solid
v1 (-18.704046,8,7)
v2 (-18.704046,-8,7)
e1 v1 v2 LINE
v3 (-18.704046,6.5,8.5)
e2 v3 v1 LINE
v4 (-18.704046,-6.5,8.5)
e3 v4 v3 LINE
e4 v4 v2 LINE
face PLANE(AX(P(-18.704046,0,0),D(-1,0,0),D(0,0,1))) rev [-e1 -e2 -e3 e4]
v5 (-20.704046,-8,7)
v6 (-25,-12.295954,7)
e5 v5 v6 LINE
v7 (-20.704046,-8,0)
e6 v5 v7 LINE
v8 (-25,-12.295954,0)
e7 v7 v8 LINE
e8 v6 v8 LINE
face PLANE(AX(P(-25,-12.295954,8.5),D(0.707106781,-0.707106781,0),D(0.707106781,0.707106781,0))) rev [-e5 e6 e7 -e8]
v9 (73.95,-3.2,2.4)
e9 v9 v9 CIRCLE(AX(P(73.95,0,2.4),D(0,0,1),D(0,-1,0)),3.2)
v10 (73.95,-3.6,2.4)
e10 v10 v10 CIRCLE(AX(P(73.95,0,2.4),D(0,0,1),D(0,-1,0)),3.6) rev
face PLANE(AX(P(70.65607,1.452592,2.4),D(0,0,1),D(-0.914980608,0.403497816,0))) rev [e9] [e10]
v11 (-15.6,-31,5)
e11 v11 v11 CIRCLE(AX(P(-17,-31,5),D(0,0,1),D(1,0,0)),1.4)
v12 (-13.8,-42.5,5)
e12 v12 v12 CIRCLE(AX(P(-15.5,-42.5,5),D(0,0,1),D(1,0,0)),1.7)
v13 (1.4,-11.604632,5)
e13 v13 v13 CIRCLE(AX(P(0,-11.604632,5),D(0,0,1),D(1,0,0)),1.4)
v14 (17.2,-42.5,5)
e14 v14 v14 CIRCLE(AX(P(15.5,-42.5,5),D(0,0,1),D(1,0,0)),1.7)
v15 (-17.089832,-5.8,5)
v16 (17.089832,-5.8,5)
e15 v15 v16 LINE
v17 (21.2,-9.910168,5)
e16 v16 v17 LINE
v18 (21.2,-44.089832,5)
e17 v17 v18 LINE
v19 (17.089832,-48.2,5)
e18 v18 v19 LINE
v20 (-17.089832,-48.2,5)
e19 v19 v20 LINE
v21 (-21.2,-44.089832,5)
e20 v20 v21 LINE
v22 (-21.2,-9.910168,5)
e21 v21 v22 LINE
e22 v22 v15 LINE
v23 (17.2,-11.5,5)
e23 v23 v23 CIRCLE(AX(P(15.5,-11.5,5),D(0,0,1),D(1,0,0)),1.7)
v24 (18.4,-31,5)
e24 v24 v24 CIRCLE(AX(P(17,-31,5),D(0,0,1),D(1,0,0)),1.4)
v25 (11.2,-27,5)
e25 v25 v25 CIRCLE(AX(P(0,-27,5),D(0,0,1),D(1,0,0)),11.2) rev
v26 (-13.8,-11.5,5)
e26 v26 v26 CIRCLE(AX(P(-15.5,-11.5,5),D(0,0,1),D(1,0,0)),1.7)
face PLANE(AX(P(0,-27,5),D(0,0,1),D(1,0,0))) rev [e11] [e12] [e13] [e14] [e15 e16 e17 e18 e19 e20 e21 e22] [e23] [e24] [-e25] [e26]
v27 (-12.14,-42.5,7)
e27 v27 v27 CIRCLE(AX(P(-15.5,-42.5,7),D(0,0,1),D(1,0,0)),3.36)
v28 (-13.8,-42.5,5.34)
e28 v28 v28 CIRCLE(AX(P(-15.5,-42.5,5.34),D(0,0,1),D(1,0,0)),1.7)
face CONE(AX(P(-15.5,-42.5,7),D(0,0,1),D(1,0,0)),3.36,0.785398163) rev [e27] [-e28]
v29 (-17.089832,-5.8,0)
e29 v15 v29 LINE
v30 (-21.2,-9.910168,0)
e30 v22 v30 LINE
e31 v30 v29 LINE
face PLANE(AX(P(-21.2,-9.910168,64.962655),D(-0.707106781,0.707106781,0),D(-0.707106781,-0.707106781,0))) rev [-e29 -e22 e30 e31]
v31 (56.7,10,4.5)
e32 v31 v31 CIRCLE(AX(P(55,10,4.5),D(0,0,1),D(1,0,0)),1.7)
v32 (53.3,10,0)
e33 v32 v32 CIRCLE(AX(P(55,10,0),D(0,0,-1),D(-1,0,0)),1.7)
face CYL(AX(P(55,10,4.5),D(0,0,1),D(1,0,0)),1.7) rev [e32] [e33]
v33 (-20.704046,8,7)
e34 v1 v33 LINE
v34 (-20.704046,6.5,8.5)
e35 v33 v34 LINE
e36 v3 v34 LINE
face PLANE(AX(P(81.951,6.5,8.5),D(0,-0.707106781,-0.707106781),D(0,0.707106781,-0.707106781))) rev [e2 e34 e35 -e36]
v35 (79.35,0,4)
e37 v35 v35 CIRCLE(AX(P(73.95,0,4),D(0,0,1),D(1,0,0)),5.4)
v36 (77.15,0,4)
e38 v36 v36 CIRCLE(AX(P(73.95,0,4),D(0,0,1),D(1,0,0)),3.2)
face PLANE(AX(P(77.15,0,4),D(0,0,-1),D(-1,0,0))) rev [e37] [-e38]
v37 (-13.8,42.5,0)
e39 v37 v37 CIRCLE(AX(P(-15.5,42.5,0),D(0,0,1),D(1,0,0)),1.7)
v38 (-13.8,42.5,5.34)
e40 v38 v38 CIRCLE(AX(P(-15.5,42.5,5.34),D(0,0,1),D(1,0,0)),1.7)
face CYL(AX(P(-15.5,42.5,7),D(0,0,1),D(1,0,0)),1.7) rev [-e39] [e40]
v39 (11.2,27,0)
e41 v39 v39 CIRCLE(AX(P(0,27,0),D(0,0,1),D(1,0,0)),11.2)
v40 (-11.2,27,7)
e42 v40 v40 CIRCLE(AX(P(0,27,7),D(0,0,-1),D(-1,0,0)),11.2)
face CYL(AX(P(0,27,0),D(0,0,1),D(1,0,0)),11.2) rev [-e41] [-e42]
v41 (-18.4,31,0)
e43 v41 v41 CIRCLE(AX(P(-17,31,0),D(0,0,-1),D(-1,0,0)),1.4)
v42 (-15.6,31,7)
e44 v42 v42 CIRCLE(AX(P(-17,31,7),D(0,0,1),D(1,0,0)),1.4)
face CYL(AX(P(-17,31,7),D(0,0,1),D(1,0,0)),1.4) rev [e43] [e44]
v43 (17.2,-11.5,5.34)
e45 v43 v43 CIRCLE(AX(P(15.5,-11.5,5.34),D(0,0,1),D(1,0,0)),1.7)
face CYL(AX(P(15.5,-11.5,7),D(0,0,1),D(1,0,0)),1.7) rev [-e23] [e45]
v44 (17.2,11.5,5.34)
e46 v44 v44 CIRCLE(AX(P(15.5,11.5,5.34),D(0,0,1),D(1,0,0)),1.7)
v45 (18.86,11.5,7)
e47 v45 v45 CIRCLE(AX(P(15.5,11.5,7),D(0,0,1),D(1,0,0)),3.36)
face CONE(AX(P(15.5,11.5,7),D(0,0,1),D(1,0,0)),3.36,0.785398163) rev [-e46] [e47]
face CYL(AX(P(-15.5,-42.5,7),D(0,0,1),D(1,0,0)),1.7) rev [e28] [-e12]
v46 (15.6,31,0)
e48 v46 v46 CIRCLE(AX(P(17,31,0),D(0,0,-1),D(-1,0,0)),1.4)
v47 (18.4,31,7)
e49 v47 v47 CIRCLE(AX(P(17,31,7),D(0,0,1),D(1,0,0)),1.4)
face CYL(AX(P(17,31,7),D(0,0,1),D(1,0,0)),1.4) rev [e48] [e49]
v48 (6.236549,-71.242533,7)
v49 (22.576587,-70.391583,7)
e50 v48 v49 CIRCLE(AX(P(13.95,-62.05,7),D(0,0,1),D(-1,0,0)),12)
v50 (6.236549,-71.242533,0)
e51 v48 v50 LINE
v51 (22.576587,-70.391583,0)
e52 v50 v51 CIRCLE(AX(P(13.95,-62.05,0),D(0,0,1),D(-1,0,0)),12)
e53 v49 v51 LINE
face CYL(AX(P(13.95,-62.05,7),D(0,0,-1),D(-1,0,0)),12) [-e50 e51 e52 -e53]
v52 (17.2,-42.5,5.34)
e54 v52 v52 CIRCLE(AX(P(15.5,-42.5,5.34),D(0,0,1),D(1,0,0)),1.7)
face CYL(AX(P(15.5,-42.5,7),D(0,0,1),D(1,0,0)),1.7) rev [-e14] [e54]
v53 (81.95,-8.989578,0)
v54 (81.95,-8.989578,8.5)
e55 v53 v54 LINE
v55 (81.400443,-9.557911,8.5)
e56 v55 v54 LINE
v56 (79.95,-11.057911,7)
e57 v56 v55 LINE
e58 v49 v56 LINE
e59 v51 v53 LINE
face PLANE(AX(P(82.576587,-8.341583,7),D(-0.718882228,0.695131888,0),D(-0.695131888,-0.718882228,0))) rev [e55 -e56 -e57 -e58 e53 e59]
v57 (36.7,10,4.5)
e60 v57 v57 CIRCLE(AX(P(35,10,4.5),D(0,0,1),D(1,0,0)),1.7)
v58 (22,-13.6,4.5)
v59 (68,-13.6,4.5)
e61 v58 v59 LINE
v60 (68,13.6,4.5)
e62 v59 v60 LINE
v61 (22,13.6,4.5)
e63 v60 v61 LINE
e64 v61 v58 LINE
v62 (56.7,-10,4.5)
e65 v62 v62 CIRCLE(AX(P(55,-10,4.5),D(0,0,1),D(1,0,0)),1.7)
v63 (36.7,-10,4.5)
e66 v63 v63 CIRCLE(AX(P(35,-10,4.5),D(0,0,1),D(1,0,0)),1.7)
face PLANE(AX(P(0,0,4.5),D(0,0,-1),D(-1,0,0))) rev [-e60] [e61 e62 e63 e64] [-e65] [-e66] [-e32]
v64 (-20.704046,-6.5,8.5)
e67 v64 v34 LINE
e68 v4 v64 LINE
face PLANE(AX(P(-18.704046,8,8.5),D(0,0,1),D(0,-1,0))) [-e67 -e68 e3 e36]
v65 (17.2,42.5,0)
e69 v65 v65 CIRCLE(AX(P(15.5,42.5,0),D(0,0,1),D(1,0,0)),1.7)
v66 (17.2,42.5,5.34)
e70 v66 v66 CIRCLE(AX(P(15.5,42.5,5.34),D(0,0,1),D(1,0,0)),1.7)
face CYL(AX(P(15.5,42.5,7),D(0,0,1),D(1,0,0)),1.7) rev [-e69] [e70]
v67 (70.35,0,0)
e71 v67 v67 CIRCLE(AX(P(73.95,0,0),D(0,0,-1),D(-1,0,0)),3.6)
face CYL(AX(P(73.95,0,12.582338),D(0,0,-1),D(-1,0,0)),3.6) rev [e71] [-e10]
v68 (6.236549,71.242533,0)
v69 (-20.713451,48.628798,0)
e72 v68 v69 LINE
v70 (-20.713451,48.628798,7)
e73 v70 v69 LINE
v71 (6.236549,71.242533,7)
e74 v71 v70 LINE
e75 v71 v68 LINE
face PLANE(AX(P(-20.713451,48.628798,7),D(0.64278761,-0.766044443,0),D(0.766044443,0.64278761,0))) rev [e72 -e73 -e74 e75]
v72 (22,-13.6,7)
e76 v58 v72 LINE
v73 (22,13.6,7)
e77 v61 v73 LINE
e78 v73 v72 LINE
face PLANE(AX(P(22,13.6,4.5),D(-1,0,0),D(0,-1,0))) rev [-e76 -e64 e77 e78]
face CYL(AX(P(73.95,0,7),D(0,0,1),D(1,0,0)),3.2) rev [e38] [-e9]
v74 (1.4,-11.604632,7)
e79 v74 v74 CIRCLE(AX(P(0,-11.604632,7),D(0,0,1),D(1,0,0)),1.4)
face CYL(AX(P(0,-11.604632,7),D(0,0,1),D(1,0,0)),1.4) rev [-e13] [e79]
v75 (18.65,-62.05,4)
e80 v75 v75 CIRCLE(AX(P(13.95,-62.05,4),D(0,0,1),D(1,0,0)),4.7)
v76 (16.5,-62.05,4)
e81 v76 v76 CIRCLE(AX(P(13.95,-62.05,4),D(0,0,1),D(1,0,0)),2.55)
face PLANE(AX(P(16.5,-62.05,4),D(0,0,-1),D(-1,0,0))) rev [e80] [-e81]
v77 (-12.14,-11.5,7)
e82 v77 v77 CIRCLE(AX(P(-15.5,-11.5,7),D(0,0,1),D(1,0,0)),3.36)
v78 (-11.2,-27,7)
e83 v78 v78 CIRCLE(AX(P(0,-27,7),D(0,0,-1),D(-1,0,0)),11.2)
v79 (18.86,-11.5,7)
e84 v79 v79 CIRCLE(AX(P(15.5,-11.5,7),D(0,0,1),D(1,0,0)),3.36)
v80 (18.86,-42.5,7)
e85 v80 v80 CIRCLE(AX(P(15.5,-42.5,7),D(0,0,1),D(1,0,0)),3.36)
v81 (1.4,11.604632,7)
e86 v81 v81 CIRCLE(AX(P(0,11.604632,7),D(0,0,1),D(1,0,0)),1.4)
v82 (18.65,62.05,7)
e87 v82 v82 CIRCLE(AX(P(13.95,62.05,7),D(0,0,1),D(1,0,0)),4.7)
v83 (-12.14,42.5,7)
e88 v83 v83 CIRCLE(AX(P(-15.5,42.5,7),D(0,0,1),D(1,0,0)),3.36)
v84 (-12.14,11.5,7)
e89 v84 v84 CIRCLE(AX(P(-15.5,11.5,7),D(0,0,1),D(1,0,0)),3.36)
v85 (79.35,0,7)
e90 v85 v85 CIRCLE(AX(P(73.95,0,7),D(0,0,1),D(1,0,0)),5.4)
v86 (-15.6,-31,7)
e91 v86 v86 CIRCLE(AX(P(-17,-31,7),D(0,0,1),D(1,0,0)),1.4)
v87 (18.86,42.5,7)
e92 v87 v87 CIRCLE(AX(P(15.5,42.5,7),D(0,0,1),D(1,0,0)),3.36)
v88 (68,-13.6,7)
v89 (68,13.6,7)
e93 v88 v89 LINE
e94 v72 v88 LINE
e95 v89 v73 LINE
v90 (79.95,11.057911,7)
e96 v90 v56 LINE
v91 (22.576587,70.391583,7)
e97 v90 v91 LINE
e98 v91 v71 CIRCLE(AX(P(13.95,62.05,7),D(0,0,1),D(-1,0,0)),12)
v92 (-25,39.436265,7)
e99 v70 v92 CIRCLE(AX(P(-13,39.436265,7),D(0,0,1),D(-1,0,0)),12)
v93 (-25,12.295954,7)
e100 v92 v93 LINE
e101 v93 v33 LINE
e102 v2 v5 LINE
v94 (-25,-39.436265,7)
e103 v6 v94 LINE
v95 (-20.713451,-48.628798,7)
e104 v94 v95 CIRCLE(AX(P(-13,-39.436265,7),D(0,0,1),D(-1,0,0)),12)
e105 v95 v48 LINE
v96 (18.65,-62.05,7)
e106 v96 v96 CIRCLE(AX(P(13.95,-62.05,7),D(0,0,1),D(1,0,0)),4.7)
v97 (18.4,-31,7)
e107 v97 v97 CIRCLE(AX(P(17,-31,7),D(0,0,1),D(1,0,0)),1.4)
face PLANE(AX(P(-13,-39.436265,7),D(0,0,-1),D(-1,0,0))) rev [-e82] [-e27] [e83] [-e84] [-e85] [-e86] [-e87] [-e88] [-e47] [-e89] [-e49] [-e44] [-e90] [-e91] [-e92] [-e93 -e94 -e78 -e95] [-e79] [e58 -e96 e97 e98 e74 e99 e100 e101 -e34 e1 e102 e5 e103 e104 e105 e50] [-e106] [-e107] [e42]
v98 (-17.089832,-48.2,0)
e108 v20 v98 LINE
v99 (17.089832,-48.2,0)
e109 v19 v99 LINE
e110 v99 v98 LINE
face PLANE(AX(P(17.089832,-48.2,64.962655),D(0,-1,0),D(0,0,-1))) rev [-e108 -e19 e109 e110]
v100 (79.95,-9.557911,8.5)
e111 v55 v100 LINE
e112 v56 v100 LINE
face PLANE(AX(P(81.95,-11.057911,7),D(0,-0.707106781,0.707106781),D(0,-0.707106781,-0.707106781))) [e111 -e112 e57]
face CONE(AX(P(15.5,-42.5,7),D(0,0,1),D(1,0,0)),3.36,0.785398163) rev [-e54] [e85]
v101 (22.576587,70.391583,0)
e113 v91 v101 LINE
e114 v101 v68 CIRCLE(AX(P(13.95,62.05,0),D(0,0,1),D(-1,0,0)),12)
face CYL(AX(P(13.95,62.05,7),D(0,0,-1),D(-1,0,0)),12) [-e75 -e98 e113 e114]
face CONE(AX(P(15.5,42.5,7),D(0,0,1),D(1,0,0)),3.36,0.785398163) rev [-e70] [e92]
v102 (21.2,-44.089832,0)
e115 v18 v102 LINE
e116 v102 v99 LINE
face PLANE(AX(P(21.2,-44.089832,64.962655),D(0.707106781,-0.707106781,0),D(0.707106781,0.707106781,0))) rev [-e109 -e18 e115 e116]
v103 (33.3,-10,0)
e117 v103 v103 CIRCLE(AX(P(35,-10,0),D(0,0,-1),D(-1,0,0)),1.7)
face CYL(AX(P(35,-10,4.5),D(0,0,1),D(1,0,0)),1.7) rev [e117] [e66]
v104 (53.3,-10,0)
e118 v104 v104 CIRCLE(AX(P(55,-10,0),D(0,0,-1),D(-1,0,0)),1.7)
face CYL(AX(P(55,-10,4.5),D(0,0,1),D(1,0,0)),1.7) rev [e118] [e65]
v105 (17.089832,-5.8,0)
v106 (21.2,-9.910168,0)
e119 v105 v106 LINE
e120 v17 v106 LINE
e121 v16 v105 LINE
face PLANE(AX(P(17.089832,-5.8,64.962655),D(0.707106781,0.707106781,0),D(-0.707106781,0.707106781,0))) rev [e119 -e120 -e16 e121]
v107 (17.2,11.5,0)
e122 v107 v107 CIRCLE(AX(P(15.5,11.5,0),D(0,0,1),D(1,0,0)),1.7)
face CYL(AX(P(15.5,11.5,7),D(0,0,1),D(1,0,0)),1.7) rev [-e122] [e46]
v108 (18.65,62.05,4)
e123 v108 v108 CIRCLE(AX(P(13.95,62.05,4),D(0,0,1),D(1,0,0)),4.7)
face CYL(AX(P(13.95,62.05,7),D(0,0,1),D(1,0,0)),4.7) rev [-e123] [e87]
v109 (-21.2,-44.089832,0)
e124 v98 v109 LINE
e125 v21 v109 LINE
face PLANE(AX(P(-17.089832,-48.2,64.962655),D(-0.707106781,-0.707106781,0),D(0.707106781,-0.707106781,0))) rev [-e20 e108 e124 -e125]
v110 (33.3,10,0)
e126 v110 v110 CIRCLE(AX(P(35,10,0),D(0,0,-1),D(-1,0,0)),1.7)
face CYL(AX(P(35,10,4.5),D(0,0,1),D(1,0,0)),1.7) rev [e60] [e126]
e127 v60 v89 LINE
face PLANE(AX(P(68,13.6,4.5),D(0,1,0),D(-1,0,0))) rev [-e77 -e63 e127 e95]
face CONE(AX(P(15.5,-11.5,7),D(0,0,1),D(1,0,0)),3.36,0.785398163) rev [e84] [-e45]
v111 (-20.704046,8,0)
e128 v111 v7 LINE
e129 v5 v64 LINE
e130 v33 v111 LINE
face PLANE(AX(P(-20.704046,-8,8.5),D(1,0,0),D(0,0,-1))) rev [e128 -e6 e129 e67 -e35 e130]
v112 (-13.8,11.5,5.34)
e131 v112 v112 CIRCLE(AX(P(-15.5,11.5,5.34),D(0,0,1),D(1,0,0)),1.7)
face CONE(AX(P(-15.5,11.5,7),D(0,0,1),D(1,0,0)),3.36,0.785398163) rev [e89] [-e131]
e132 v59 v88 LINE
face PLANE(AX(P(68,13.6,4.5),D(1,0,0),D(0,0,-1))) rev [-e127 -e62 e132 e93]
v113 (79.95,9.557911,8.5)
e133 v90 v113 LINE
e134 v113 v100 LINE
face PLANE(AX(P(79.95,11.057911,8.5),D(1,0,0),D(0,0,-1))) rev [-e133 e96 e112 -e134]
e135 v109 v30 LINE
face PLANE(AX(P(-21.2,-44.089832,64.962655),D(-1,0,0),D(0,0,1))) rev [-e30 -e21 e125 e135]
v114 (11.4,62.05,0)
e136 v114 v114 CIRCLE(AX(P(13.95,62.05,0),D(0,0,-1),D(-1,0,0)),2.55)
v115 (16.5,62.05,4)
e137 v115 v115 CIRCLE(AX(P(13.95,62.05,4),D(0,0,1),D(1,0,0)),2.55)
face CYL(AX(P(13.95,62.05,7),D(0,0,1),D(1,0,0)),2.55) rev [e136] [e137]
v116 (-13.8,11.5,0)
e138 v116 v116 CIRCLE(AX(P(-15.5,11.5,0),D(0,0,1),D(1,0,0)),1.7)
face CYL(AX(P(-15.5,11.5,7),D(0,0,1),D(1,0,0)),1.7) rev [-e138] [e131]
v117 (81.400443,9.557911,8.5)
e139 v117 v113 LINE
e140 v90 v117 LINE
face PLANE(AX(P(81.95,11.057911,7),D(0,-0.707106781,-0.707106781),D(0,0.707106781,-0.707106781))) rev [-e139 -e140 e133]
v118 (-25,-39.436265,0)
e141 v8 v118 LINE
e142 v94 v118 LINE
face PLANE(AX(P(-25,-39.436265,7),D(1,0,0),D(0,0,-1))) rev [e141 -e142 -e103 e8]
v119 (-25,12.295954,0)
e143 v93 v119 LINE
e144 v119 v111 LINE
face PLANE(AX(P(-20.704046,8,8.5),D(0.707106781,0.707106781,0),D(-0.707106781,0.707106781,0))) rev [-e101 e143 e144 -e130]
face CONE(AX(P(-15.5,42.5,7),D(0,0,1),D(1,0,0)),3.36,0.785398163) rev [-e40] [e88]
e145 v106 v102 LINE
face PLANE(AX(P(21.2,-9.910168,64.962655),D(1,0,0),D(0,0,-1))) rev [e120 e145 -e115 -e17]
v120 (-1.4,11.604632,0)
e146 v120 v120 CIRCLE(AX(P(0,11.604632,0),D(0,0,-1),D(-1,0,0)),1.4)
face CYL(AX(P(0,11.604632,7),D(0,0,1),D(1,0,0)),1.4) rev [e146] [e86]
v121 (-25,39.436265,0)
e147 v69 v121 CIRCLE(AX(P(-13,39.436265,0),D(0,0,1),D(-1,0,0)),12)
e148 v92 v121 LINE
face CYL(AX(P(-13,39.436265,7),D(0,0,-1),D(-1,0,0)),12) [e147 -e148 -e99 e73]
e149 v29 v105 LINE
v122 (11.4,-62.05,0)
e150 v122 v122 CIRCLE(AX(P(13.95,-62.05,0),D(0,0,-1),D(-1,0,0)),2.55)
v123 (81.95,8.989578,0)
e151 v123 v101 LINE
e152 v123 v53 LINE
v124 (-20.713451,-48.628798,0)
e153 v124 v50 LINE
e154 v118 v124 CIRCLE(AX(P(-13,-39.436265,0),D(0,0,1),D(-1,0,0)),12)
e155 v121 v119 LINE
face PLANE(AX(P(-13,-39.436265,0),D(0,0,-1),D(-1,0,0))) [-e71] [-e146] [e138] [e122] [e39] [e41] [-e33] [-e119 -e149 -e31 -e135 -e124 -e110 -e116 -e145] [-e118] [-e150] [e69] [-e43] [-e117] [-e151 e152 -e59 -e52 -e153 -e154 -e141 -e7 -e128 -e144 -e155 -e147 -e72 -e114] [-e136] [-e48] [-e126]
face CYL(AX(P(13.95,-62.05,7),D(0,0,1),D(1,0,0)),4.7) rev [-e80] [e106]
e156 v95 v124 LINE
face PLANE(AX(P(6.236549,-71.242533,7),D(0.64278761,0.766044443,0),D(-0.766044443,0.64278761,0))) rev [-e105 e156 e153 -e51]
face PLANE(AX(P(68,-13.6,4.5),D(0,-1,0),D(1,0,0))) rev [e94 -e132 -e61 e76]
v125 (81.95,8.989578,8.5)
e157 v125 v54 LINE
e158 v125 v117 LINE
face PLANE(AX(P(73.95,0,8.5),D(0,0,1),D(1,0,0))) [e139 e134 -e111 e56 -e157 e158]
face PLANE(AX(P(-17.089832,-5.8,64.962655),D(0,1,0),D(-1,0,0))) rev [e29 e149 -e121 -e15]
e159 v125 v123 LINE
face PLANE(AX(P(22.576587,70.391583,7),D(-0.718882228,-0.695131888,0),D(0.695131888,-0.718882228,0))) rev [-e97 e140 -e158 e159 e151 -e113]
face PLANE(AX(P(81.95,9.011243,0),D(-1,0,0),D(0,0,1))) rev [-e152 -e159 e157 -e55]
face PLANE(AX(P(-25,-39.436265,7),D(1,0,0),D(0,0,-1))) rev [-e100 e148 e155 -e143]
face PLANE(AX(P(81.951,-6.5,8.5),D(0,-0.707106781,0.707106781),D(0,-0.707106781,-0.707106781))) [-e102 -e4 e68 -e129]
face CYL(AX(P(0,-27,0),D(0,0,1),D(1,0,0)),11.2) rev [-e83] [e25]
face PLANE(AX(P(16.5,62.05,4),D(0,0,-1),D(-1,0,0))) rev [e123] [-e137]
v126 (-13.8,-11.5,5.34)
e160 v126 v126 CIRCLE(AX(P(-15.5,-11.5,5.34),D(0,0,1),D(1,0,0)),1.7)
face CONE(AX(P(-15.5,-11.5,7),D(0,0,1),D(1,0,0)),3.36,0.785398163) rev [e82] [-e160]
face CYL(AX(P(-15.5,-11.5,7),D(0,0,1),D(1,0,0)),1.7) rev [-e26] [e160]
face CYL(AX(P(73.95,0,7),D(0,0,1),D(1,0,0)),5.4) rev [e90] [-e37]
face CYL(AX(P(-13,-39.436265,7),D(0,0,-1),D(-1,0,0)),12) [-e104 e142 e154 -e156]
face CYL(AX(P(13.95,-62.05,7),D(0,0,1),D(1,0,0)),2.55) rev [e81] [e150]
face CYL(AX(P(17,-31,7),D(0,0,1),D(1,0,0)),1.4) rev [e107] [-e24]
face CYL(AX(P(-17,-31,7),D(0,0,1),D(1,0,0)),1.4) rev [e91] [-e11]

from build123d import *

# Parameters (mm, degrees)
BOSS_EXTRUDE1_DEPTH                = 7
BOSS_EXTRUDE2_DEPTH                = 1.5
SKETCH29_W                         = 6.05
SKETCH29_H                         = 18.000820755
CUT_EXTRUDE6_DEPTH                 = 114.767548097
CUT_EXTRUDE1_DEPTH                 = 111.671608825
CUT_EXTRUDE1_DEPTH_BACK            = 111.671608825
SKETCH3_R                          = 11.2
CUT_EXTRUDE3_START                 = -5
CUT_EXTRUDE3_DEPTH                 = 5
SKETCH8_W                          = 46
SKETCH8_H                          = 27.2
CUT_EXTRUDE4_DEPTH                 = 2.5
CUT_EXTRUDE5_START                 = -2.4
SKETCH16_R                         = 3.6
CUT_EXTRUDE5_DEPTH                 = 2.4
CUT_EXTRUDE7_DEPTH                 = 111.776599515
SKETCH32_W                         = 1.5
SKETCH32_H                         = 16
BOSS_EXTRUDE3_DEPTH                = 2
CUT_EXTRUDE8_DEPTH                 = 129.7251141
CUT_EXTRUDE9_REACH                 = 128.86
CSK_FOR_M3_SFHCS1_D                = 3.4
CSK_FOR_M3_SFHCS1_CSINK_D          = 6.72
CSK_FOR_M3_SFHCS1_CSINK_ANGLE      = 90
M3_CLEARANCE_HOLE1_D               = 3.4
CBORE_START                        = 4
CBORE_FOR_M5_SHCS1_OUTLINE_R       = 5.4
CBORE_FOR_M5_SHCS1_DEPTH           = 3
CBORE_START_2                      = 2.4
CBORE_FOR_M5_SHCS1_2_OUTLINE_R     = 3.2
CBORE_FOR_M5_SHCS1_2_DEPTH         = 1.6
CBORE_FOR_M5_SBHCS1_OUTLINE_R      = 4.7
CBORE_FOR_M5_SBHCS1_DEPTH          = 3
CBORE_FOR_M5_SBHCS1_2_OUTLINE_R    = 2.55
CBORE_FOR_M5_SBHCS1_2_DEPTH        = 4
F_2_8_2_8_DIAMETER_HOLE1_OUTLINE_R = 1.4
F_2_8_2_8_DIAMETER_HOLE1_DEPTH     = 7


# Read off the part's stored shape, not the designer's step: CBORE for M5 SHCS1, CBORE for M5 SBHCS1, Ø2.8 (2.8) Diameter Hole1
with BuildPart() as part:
    # Sketch1 → Boss-Extrude1 (new body)
    with BuildSketch(Plane.XY):
        with BuildLine():
            Line((-25, -39.43626494), (-25, 39.43626494))
            ThreePointArc((-25, 39.43626494), (-23.875693444, 44.507684081), (-20.713451316, 48.628798257))
            Line((-20.713451316, 48.628798257), (6.236548684, 71.242533317))
            ThreePointArc((6.236548684, 71.242533317), (14.574085994, 74.03376054), (22.576586736, 70.391582661))
            Line((22.576586736, 70.391582661), (82.576586736, 8.341582661))
            ThreePointArc((82.576586736, 8.341582661), (85.95, 0), (82.576586736, -8.341582661))
            Line((82.576586736, -8.341582661), (22.576586736, -70.391582661))
            ThreePointArc((22.576586736, -70.391582661), (14.574085994, -74.03376054), (6.236548684, -71.242533317))
            Line((6.236548684, -71.242533317), (-20.713451316, -48.628798257))
            ThreePointArc((-20.713451316, -48.628798257), (-23.875693444, -44.507684081), (-25, -39.43626494))
        make_face()
    extrude(amount=BOSS_EXTRUDE1_DEPTH)

    # Sketch30 → Boss-Extrude2 (add)
    with BuildSketch(Plane.XY.offset(7)):
        with BuildLine():
            Line((79.95, 11.05791111), (79.95, -11.05791111))
            Line((79.95, -11.05791111), (82.576586736, -8.341582661))
            ThreePointArc((82.576586736, -8.341582661), (85.95, 0), (82.576586736, 8.341582661))
            Line((82.576586736, 8.341582661), (79.95, 11.05791111))
        make_face()
    extrude(amount=BOSS_EXTRUDE2_DEPTH)

    # Sketch29 → Cut-Extrude6 (cut, through all)
    with BuildSketch(Plane.XY.offset(8.5)):
        with Locations((84.975, 0.0108326)):
            Rectangle(SKETCH29_W, SKETCH29_H)
    extrude(amount=-CUT_EXTRUDE6_DEPTH, mode=Mode.SUBTRACT)

    # Sketch3 → Cut-Extrude1 (cut, two sides: drawn at the far end of the back side and taken through both)
    with BuildSketch(Plane.XY.offset(7).offset(-CUT_EXTRUDE1_DEPTH_BACK)):
        with Locations((0, 27)):
            Circle(SKETCH3_R)
        with Locations((0, -27)):
            Circle(SKETCH3_R)
    extrude(amount=CUT_EXTRUDE1_DEPTH + CUT_EXTRUDE1_DEPTH_BACK, mode=Mode.SUBTRACT)

    # Sketch6 → Cut-Extrude3 (cut)
    with BuildSketch(Plane(origin=(0, 0, 0), x_dir=(-1, 0, 0), z_dir=(0, 0, -1)).offset(CUT_EXTRUDE3_START)):
        Polygon((21.2, -9.910167799), (17.089832201, -5.8), (-17.089832201, -5.8), (-21.2, -9.910167799), (-21.2, -44.089832201), (-17.089832201, -48.2), (17.089832201, -48.2), (21.2, -44.089832201), align=None)
    extrude(amount=CUT_EXTRUDE3_DEPTH, mode=Mode.SUBTRACT)

    # Sketch8 → Cut-Extrude4 (cut)
    with BuildSketch(Plane.XY.offset(7)):
        with Locations((45, 0)):
            Rectangle(SKETCH8_W, SKETCH8_H)
    extrude(amount=-CUT_EXTRUDE4_DEPTH, mode=Mode.SUBTRACT)

    # Sketch16 → Cut-Extrude5 (cut)
    with BuildSketch(Plane(origin=(0, 0, 0), x_dir=(-1, 0, 0), z_dir=(0, 0, -1)).offset(CUT_EXTRUDE5_START)):
        with Locations((-73.95, 0)):
            Circle(SKETCH16_R)
    extrude(amount=CUT_EXTRUDE5_DEPTH, mode=Mode.SUBTRACT)

    # Sketch31 → Cut-Extrude7 (cut, through all)
    with BuildSketch(Plane(origin=(0, 0, 0), x_dir=(-1, 0, 0), z_dir=(0, 0, -1))):
        Polygon((25, -12.295954236), (20.704045764, -8), (20.704045764, 8), (25, 12.295954236), align=None)
    extrude(amount=-CUT_EXTRUDE7_DEPTH, mode=Mode.SUBTRACT)

    # Sketch32 → Boss-Extrude3 (add)
    with BuildSketch(Plane.ZY.offset(20.704045764)):
        with Locations((7.75, 0)):
            Rectangle(SKETCH32_W, SKETCH32_H)
    extrude(amount=-BOSS_EXTRUDE3_DEPTH)

    # Sketch34 → Cut-Extrude8 (cut, through all)
    with BuildSketch(Plane.ZY.offset(-79.95)):
        Polygon((7, 11.05791111), (8.5, 9.55791111), (8.5, 11.05791111), align=None)
    cut_extrude8 = extrude(amount=-CUT_EXTRUDE8_DEPTH, mode=Mode.SUBTRACT)

    # Sketch35 → Cut-Extrude9 (cut, up to next)
    with BuildSketch(Plane.ZY.offset(20.704045764), mode=Mode.PRIVATE) as cut_extrude9_sk1:
        Polygon((7, 8), (8.5, 8), (8.5, 6.5), align=None)
    cut_extrude9_tool1 = extrude(cut_extrude9_sk1.sketch, amount=-CUT_EXTRUDE9_REACH, mode=Mode.PRIVATE) & part.part
    cut_extrude9 = cut_extrude9_tool1.solids().sort_by_distance((-20.704046, 7.5, 8))[0]
    add(cut_extrude9, mode=Mode.SUBTRACT)

    # Mirror2: Cut-Extrude8, Cut-Extrude9 across plane
    add(cut_extrude8.mirror(Plane.ZX), mode=Mode.SUBTRACT)
    add(cut_extrude9.mirror(Plane.ZX), mode=Mode.SUBTRACT)

    # CSK for M3 SFHCS1 (through all)
    with Locations(Plane.XY.offset(7)):
        with Locations((-15.5, 42.5), (15.5, 42.5), (-15.5, 11.5), (15.5, -42.5), (-15.5, -42.5), (-15.5, -11.5), (15.5, 11.5), (15.5, -11.5)):
            CounterSinkHole(CSK_FOR_M3_SFHCS1_D / 2, CSK_FOR_M3_SFHCS1_CSINK_D / 2, counter_sink_angle=CSK_FOR_M3_SFHCS1_CSINK_ANGLE)

    # M3 Clearance Hole1 (through all)
    with Locations(Plane.XY.offset(4.5)):
        with Locations((35, 10), (35, -10), (55, 10), (55, -10)):
            Hole(M3_CLEARANCE_HOLE1_D / 2)

    # CBORE for M5 SHCS1 outline → CBORE for M5 SHCS1 (cut)
    with BuildSketch(Plane.XY.offset(CBORE_START)):
        with Locations((73.95, 0)):
            Circle(CBORE_FOR_M5_SHCS1_OUTLINE_R)
    extrude(amount=CBORE_FOR_M5_SHCS1_DEPTH, mode=Mode.SUBTRACT)

    # CBORE for M5 SHCS1 2 outline → CBORE for M5 SHCS1 2 (cut)
    with BuildSketch(Plane.XY.offset(CBORE_START_2)):
        with Locations((73.95, 0)):
            Circle(CBORE_FOR_M5_SHCS1_2_OUTLINE_R)
    extrude(amount=CBORE_FOR_M5_SHCS1_2_DEPTH, mode=Mode.SUBTRACT)

    # CBORE for M5 SBHCS1 outline → CBORE for M5 SBHCS1 (cut)
    with BuildSketch(Plane.XY.offset(CBORE_START)):
        with Locations((13.95, -62.05)):
            Circle(CBORE_FOR_M5_SBHCS1_OUTLINE_R)
        with Locations((13.95, 62.05)):
            Circle(CBORE_FOR_M5_SBHCS1_OUTLINE_R)
    extrude(amount=CBORE_FOR_M5_SBHCS1_DEPTH, mode=Mode.SUBTRACT)

    # CBORE for M5 SBHCS1 2 outline → CBORE for M5 SBHCS1 2 (cut)
    with BuildSketch(Plane.XY):
        with Locations((13.95, -62.05)):
            Circle(CBORE_FOR_M5_SBHCS1_2_OUTLINE_R)
        with Locations((13.95, 62.05)):
            Circle(CBORE_FOR_M5_SBHCS1_2_OUTLINE_R)
    extrude(amount=CBORE_FOR_M5_SBHCS1_2_DEPTH, mode=Mode.SUBTRACT)

    # Ø2.8 (2.8) Diameter Hole1 outline → Ø2.8 (2.8) Diameter Hole1 (cut)
    with BuildSketch(Plane.XY):
        with Locations((17, 31)):
            Circle(F_2_8_2_8_DIAMETER_HOLE1_OUTLINE_R)
        with Locations((-17, 31)):
            Circle(F_2_8_2_8_DIAMETER_HOLE1_OUTLINE_R)
        with Locations((0, 11.604631616)):
            Circle(F_2_8_2_8_DIAMETER_HOLE1_OUTLINE_R)
    f_2_8_2_8_diameter_hole1 = extrude(amount=F_2_8_2_8_DIAMETER_HOLE1_DEPTH, mode=Mode.SUBTRACT)

    # Mirror1: Ø2.8 (2.8) Diameter Hole1 across plane
    add(f_2_8_2_8_diameter_hole1.mirror(Plane.ZX), mode=Mode.SUBTRACT)


solid = part.part
